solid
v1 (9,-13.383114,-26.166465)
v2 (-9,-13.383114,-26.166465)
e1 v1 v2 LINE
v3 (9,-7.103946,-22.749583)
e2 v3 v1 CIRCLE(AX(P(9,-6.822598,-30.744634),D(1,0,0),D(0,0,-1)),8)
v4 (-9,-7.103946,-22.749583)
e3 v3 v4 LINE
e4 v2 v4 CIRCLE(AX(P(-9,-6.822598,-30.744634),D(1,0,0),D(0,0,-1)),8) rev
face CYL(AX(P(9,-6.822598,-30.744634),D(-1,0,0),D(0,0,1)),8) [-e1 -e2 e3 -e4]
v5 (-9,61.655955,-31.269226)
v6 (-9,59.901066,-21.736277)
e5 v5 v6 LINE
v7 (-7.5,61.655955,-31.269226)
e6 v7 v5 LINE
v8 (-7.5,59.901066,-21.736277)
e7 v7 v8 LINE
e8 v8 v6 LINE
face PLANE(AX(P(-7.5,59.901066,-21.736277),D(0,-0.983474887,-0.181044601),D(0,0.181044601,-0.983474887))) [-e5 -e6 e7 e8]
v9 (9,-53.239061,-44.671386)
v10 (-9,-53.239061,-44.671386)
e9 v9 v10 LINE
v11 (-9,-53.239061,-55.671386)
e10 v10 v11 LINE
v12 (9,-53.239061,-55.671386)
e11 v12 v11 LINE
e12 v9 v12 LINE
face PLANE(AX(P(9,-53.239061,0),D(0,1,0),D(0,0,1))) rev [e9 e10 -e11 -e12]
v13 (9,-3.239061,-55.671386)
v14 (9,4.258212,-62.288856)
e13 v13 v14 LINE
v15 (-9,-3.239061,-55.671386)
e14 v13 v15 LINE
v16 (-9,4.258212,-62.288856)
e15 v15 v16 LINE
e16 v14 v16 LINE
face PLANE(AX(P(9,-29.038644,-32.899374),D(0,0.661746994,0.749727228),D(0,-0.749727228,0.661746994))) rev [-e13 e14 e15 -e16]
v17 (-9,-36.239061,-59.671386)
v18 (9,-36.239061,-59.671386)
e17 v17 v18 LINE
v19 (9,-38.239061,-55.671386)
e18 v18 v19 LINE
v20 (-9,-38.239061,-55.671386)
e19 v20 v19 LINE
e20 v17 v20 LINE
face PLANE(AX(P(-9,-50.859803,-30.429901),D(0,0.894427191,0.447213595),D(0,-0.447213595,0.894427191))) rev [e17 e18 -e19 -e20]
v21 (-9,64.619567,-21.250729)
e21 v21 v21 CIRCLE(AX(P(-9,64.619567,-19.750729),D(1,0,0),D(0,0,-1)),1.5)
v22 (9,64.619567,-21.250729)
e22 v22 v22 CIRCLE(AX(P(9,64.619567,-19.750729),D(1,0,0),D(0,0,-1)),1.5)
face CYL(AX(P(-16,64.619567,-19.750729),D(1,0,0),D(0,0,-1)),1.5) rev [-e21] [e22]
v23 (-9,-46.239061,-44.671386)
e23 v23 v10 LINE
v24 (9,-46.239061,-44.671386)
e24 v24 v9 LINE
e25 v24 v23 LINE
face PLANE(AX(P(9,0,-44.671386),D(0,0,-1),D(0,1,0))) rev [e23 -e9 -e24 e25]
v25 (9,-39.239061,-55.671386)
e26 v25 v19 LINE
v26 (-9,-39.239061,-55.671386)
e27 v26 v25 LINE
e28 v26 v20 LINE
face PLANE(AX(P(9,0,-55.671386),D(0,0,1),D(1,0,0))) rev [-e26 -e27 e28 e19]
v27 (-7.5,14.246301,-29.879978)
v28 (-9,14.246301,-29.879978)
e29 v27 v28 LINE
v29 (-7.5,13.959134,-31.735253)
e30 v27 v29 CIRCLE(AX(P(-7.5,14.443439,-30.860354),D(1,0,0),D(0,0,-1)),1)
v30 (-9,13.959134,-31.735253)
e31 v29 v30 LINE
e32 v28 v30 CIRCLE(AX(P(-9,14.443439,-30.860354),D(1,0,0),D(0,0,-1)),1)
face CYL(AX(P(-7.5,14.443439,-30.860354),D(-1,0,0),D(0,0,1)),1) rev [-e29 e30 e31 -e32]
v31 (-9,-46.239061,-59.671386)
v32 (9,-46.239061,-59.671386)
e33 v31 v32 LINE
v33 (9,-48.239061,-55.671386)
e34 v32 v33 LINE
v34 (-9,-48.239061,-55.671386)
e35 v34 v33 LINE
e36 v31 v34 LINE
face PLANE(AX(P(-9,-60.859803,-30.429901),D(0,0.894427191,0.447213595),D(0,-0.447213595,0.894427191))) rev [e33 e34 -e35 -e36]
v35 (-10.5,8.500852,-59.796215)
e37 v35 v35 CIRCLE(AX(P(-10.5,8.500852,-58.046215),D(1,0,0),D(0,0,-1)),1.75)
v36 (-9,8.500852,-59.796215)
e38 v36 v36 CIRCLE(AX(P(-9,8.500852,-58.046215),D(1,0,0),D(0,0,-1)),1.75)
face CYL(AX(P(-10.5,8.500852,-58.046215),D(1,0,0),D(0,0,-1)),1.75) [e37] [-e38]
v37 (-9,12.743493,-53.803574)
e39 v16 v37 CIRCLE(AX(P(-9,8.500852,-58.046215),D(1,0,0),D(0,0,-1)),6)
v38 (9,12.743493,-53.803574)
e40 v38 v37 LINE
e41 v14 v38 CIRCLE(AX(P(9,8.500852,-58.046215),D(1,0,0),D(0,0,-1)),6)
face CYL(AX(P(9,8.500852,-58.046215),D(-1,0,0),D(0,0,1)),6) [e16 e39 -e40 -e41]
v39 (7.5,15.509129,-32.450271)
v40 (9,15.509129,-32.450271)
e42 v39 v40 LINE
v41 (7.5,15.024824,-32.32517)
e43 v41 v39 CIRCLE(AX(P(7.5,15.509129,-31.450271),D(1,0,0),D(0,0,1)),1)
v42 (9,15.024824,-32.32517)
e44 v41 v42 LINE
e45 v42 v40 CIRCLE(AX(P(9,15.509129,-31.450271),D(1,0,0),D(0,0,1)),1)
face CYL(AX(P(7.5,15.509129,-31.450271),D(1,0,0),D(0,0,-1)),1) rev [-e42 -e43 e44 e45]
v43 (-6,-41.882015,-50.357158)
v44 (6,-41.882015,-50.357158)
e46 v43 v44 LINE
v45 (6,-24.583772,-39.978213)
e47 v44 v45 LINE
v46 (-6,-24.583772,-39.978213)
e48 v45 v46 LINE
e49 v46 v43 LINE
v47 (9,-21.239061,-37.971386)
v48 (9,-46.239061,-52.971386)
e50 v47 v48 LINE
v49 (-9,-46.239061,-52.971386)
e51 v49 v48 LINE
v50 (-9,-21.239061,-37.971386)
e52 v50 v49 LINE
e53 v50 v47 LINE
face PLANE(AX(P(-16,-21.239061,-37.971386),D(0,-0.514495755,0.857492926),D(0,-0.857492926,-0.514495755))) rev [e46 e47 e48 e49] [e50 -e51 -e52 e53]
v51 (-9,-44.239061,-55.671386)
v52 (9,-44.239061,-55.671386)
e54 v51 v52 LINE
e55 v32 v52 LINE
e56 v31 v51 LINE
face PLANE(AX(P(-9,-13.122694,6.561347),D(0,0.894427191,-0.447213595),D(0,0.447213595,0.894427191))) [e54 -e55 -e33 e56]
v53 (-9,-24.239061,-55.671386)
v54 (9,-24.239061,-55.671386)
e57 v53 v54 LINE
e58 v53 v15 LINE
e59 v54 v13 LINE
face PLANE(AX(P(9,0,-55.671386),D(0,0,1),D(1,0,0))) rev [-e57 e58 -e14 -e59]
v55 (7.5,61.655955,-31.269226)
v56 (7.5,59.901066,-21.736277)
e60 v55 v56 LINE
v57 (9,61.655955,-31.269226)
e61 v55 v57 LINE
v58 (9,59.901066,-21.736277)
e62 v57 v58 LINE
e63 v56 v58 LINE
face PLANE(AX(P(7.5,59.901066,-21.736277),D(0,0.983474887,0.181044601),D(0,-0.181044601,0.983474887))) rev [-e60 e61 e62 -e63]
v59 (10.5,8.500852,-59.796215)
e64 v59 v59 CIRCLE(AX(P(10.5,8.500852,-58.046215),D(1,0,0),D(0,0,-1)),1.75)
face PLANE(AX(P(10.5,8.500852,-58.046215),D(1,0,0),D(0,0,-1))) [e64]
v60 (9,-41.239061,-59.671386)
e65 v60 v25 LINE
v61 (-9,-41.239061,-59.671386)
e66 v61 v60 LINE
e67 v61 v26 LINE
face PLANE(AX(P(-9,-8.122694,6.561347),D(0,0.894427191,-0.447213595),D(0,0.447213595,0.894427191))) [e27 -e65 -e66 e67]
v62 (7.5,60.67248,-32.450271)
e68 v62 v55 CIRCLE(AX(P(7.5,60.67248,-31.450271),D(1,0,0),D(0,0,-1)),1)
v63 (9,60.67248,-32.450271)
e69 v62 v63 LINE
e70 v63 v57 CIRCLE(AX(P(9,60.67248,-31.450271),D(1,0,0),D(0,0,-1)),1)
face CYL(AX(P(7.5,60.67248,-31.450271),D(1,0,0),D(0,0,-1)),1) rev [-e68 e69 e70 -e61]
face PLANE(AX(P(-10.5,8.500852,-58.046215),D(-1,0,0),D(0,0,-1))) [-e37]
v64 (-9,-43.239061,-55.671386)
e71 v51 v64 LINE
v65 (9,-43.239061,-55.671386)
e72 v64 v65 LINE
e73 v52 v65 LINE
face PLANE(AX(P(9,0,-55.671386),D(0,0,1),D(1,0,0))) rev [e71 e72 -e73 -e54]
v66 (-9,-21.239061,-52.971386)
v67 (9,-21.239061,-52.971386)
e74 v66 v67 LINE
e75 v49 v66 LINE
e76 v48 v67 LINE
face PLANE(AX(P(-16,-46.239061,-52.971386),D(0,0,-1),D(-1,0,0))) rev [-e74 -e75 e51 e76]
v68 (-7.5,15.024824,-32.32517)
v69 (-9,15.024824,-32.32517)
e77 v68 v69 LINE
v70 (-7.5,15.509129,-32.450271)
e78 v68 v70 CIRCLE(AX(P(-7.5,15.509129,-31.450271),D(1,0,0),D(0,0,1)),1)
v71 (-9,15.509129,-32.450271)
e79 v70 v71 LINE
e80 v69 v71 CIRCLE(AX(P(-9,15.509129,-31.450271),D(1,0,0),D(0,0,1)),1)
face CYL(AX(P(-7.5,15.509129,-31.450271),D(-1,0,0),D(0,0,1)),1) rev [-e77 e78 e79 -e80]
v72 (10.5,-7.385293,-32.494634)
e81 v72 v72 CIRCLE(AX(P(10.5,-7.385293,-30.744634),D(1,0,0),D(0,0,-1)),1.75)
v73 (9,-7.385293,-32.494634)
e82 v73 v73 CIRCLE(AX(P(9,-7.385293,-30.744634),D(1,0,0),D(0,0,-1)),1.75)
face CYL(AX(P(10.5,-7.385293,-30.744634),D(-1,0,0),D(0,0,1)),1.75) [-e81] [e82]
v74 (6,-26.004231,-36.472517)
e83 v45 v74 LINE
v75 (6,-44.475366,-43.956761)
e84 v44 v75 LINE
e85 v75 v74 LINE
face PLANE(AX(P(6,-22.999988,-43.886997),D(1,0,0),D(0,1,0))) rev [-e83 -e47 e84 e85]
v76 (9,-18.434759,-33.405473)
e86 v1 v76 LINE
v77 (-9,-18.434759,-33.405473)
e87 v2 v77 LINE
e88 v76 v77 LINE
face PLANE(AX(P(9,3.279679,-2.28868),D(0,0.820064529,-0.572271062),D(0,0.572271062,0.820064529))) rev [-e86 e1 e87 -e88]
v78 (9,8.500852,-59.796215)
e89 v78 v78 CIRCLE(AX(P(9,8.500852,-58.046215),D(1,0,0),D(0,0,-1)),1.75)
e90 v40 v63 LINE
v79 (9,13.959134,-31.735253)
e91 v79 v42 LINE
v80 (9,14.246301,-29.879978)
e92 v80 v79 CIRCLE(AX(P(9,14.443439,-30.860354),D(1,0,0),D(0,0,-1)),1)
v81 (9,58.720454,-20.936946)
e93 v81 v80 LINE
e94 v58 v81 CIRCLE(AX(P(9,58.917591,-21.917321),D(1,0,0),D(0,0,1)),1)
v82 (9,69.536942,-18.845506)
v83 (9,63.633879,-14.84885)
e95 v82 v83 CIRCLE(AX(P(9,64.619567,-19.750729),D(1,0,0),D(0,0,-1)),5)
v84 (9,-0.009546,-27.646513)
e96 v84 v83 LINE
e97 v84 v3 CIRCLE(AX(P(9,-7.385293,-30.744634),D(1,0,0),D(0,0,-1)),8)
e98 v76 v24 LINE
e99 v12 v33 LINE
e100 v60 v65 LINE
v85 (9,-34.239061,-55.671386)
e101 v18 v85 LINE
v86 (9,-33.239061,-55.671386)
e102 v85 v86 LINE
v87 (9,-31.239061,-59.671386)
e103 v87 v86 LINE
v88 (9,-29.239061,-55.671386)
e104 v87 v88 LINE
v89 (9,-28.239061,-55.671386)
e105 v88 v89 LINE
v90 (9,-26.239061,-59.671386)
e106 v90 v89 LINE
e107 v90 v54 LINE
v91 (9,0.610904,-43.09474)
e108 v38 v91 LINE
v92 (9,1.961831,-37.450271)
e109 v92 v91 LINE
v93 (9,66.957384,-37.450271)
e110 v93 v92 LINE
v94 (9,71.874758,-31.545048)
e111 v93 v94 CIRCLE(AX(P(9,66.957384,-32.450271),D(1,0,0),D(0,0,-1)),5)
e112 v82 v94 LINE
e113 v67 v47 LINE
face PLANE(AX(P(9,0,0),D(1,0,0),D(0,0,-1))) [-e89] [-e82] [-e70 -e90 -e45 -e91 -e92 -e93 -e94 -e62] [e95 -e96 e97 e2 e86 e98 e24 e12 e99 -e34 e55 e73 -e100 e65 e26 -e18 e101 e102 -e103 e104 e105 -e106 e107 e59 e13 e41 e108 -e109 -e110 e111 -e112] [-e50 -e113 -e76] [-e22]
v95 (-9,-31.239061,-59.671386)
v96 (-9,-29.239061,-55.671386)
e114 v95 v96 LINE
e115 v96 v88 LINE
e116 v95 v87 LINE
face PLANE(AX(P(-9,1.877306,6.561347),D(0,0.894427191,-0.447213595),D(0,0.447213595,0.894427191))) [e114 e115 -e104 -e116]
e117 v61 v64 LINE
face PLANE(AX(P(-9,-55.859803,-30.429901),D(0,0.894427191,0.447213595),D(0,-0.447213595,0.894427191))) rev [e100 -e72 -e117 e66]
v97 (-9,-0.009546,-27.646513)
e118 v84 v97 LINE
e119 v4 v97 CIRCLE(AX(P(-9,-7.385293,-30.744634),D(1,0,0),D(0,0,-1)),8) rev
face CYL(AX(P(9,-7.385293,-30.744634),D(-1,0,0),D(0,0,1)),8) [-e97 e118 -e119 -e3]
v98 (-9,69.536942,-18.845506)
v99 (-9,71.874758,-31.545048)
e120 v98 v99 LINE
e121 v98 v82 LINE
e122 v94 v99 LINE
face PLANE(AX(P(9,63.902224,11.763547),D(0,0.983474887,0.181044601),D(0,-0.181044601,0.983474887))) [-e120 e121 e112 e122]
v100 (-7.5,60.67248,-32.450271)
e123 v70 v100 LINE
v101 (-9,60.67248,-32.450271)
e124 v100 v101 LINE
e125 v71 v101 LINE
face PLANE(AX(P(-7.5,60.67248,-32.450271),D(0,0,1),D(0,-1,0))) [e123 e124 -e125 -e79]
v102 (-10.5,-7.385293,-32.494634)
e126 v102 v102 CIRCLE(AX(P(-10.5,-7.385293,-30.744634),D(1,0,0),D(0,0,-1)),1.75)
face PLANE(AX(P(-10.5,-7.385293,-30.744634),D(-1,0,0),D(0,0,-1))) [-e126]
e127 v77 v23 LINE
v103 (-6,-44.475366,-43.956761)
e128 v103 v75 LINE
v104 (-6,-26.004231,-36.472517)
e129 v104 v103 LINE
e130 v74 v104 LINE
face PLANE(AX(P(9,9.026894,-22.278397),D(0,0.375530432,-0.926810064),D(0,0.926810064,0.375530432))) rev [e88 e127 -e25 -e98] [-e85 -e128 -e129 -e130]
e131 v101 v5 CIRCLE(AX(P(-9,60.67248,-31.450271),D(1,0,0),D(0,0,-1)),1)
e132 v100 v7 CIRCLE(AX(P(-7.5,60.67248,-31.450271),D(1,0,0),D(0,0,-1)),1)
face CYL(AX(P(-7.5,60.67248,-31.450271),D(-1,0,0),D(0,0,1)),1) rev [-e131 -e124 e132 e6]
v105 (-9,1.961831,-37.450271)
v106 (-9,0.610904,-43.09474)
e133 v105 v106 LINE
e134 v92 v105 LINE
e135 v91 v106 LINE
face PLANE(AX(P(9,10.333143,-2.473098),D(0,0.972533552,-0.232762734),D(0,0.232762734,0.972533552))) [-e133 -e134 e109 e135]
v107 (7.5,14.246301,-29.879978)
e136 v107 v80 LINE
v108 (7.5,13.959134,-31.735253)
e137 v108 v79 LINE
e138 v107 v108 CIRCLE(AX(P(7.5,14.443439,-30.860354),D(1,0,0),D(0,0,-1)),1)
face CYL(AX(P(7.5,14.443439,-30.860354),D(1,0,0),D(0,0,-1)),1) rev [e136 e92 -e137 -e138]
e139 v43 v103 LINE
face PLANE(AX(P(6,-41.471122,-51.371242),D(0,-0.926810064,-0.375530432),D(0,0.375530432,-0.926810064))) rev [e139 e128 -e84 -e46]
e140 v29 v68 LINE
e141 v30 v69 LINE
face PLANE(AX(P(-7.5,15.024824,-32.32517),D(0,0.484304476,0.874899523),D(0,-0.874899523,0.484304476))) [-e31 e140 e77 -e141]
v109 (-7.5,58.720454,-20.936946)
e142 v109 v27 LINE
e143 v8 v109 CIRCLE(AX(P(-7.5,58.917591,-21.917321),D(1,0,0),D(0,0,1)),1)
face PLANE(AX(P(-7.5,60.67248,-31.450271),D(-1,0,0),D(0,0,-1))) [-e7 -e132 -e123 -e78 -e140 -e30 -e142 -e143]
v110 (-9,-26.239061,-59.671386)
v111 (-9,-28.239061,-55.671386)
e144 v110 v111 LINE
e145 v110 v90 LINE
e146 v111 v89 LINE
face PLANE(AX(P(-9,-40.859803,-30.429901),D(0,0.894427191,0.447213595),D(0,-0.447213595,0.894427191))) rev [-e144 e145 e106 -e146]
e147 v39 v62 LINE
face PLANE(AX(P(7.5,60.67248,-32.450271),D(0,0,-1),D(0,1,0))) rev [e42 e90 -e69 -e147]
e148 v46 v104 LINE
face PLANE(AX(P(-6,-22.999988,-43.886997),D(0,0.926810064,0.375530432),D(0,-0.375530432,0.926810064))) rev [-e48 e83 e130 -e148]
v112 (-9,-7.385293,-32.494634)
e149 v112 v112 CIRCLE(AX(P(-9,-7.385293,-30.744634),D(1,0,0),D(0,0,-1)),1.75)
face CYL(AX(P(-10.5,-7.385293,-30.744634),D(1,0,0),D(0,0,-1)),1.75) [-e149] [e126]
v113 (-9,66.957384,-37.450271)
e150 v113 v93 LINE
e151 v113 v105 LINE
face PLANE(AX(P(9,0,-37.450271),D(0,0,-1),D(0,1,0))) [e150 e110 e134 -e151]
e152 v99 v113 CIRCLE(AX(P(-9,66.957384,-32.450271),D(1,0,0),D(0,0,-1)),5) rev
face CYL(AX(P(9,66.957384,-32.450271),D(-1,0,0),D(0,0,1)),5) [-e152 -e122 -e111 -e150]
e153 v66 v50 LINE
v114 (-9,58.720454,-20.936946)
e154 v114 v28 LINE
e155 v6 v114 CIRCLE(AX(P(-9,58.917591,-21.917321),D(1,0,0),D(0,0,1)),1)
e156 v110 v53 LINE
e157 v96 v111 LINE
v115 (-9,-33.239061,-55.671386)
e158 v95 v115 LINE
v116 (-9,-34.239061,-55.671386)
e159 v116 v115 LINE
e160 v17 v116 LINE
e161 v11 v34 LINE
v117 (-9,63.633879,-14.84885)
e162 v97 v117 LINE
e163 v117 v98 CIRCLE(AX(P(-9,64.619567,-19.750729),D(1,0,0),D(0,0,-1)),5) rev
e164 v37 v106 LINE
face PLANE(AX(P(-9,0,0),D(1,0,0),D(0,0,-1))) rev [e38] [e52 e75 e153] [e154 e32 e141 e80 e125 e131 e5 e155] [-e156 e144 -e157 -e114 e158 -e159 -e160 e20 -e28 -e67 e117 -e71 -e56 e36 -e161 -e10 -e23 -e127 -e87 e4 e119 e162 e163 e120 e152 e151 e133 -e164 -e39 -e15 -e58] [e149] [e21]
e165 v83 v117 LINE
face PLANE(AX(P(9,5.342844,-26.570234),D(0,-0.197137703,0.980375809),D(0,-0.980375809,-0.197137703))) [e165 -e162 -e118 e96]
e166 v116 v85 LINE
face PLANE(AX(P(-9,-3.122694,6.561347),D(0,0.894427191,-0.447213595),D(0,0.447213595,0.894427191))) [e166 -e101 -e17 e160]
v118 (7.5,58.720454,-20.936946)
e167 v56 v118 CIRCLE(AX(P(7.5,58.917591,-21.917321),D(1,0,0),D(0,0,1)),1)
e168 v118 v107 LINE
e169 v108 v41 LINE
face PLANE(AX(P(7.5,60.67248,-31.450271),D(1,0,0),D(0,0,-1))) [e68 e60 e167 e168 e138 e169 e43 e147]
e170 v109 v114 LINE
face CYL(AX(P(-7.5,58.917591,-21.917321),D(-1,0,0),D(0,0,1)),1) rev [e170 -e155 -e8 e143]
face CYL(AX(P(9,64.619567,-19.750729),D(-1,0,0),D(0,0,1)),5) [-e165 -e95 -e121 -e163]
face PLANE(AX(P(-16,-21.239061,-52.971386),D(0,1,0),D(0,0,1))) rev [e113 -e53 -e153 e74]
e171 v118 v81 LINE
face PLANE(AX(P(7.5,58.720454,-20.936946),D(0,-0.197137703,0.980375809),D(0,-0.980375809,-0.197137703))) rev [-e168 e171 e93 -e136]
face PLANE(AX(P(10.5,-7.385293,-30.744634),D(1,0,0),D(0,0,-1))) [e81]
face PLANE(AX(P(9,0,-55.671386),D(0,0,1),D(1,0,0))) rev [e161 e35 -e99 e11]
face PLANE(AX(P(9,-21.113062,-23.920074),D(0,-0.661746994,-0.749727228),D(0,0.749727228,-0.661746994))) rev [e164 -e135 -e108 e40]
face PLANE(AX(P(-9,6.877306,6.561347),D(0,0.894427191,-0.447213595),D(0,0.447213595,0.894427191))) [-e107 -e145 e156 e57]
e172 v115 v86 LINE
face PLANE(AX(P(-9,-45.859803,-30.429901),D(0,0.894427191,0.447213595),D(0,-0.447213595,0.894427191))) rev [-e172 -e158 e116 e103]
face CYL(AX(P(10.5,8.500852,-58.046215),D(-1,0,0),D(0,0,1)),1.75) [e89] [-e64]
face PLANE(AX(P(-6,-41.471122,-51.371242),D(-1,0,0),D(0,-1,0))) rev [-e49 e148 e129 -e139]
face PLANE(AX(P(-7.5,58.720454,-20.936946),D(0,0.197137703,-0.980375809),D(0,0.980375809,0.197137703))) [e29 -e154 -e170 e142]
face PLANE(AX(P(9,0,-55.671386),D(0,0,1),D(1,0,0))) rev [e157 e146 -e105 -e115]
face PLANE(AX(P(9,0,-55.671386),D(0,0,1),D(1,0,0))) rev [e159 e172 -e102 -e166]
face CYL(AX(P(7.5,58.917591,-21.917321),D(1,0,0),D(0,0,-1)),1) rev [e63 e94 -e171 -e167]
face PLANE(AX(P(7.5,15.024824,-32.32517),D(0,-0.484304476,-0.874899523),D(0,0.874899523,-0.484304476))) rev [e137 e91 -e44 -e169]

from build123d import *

# Parameters (mm, degrees)
BOSS_EXTRUDE1_DEPTH = 9
CUT_EXTRUDE1_DEPTH  = 25
BOSS_EXTRUDE2_DEPTH = 18
LPATTERN1_COUNT     = 5
LPATTERN1_PITCH     = 5
FILLET1_R           = 8
FILLET2_R           = 5
SKETCH5_R           = 1.5
CUT_EXTRUDE2_DEPTH  = 25
SKETCH8_W           = 12
SKETCH8_H           = 19.929795107
CUT_EXTRUDE4_DEPTH  = 8
SKETCH9_R           = 1.75
BOSS_EXTRUDE3_DEPTH = 1.5
SKETCH10_R          = 1.75
BOSS_EXTRUDE4_DEPTH = 1.5
CUT_EXTRUDE6_DEPTH  = 1.5


with BuildPart() as part:
    # Sketch1 → Boss-Extrude1 (new, symmetric)
    with BuildSketch(Plane(origin=(0, 0, 0), x_dir=(0, 0, -1), z_dir=(1, 0, 0))):
        Polygon((55.671385575, -3.239060519), (62.288855516, 4.258211757), (53.803574142, 12.743493131), (43.094739802, 0.610903558), (37.450270875, 1.961830752), (27.646512788, -0.009546276), (22.744633745, -0.995234789), (22.744633745, -10.995234789), (33.405472618, -18.4347586), (44.671385575, -46.239060519), (44.671385575, -53.239060519), (55.671385575, -53.239060519), align=None)
        Polygon((37.450270875, 1.961830752), (27.646512788, -0.009546276), (13.846873598, 68.616760329), (37.450270875, 72.961830752), align=None)
        with BuildLine():
            ThreePointArc((62.288855516, 4.258211757), (62.288855516, 12.743493131), (53.803574142, 12.743493131))
            Line((53.803574142, 12.743493131), (62.288855516, 4.258211757))
        make_face()
    extrude(amount=BOSS_EXTRUDE1_DEPTH, both=True)

    # Sketch3 → Cut-Extrude1 (cut)
    with BuildSketch(Plane(origin=(9, 0, 0), x_dir=(0, 0, -1), z_dir=(1, 0, 0))):
        Polygon((52.971385575, -46.239060519), (52.971385575, -21.239060519), (37.971385575, -21.239060519), align=None)
    extrude(amount=-CUT_EXTRUDE1_DEPTH, mode=Mode.SUBTRACT)

    # Sketch4 → Boss-Extrude2 (add)
    with BuildSketch(Plane(origin=(9, 0, 0), x_dir=(0, 0, -1), z_dir=(1, 0, 0))):
        Polygon((55.671385575, -44.239060519), (55.671385575, -46.239060519), (59.671385575, -46.239060519), align=None)
        Polygon((59.671385575, -46.239060519), (55.671385575, -46.239060519), (55.671385575, -48.239060519), align=None)
    boss_extrude2 = extrude(amount=-BOSS_EXTRUDE2_DEPTH)

    # LPattern1: Boss-Extrude2 ×5
    with Locations(*[(0, i * LPATTERN1_PITCH, 0) for i in range(1, LPATTERN1_COUNT)]):
        add(boss_extrude2)

    # Fillet1
    # the kernel refuses this fillet: 8 mm, written as the material it takes off along each edge
    with BuildSketch(Plane(origin=(-19.431592215, -10.995234789, -22.744633745), x_dir=(0, 1, 0), z_dir=(1, 0, 0))) as fillet1_piece_1:
        with BuildLine():
            CenterArc((FILLET1_R * 0.521579610744, -FILLET1_R), FILLET1_R, 90, 55.091253842)
            Line((-FILLET1_R * 0.298484917938, -FILLET1_R * 0.427728937655), (-FILLET1_R * 0.314886208512, -FILLET1_R * 0.416283516408))
            Line((-FILLET1_R * 0.314886208512, -FILLET1_R * 0.416283516408), (-FILLET1_R * 0.0104315922149, FILLET1_R * 0.02))
            Line((-FILLET1_R * 0.0104315922149, FILLET1_R * 0.02), (FILLET1_R * 0.521579610744, FILLET1_R * 0.02))
            Line((FILLET1_R * 0.521579610744, FILLET1_R * 0.02), (FILLET1_R * 0.521579610744, 0))
        make_face()
    extrude(amount=38.86318443, mode=Mode.SUBTRACT)
    with BuildSketch(Plane(origin=(-24.975146678, -0.995234789, -22.744633745), x_dir=(0, 0.1971377027252409, -0.9803758086388171), z_dir=(1, 0, 0))) as fillet1_piece_2:
        with BuildLine():
            CenterArc((6.583284982, -7.841760559), FILLET1_R, 101.414804466, 67.215566165)
            Line((-1.259721487, -6.264658937), (-1.416581616, -6.233116905))
            Line((-1.416581616, -6.233116905), (-0.156860129, 0.031542032))
            Line((-0.156860129, 0.031542032), (0, 0.16))
            ThreePointArc((0, 0.16), (2.5, 0.16), (4.9683343, 0.156835211))
            Line((4.9683343, 0.156835211), (5, 0))
        make_face()
    extrude(amount=49.950293357, mode=Mode.SUBTRACT)

    # Fillet2
    fillet2_edges = [part.edges().sort_by_distance(p)[0] for p in [
        (0, 68.616760329, -13.846873598),
        (0, 72.961830752, -37.450270875),
    ]]
    fillet(fillet2_edges, radius=FILLET2_R)

    # Sketch5 → Cut-Extrude2 (cut)
    with BuildSketch(Plane(origin=(9, 0, 0), x_dir=(0, 0, -1), z_dir=(1, 0, 0))):
        with Locations((19.750729409, 64.619567483)):
            Circle(SKETCH5_R)
    extrude(amount=-CUT_EXTRUDE2_DEPTH, mode=Mode.SUBTRACT)

    # Sketch8 → Cut-Extrude4 (cut)
    with BuildSketch(Plane(origin=(0, 9.02689363, -22.278396507), x_dir=(1, 0, 0), z_dir=(0, -0.3755304319039708, 0.926810063990469))):
        with Locations((0, -47.762420436)):
            Rectangle(SKETCH8_W, SKETCH8_H)
    extrude(amount=-CUT_EXTRUDE4_DEPTH, mode=Mode.SUBTRACT)

    # Sketch9 → Boss-Extrude3 (add)
    with BuildSketch(Plane(origin=(9, 0, 0), x_dir=(0, 0, -1), z_dir=(1, 0, 0))):
        with Locations((58.046214829, 8.500852444)):
            Circle(SKETCH9_R)
    boss_extrude3 = extrude(amount=BOSS_EXTRUDE3_DEPTH)

    # Sketch10 → Boss-Extrude4 (add)
    with BuildSketch(Plane(origin=(9, 0, 0), x_dir=(0, 0, -1), z_dir=(1, 0, 0))):
        with Locations((30.744633745, -7.385293461)):
            Circle(SKETCH10_R)
    boss_extrude4 = extrude(amount=BOSS_EXTRUDE4_DEPTH)

    # Sketch11 → Cut-Extrude6 (cut)
    with BuildSketch(Plane(origin=(9, 0, 0), x_dir=(0, 0, -1), z_dir=(1, 0, 0))):
        with BuildLine():
            Line((32.450270875, 60.672480234), (32.450270875, 15.509128812))
            ThreePointArc((32.450270875, 15.509128812), (32.418490768, 15.259028355), (32.325170397, 15.024824336))
            Line((32.325170397, 15.024824336), (31.735253047, 13.959134396))
            ThreePointArc((31.735253047, 13.959134396), (30.707391109, 13.455206865), (29.879977716, 14.246301169))
            Line((29.879977716, 14.246301169), (20.936945668, 58.720453776))
            ThreePointArc((20.936945668, 58.720453776), (21.089259967, 59.478228738), (21.736276876, 59.901066366))
            Line((21.736276876, 59.901066366), (31.269226274, 61.655955121))
            ThreePointArc((31.269226274, 61.655955121), (32.09017532, 61.440934723), (32.450270875, 60.672480234))
        make_face()
    cut_extrude6 = extrude(amount=-CUT_EXTRUDE6_DEPTH, mode=Mode.SUBTRACT)

    # Mirror1: Boss-Extrude3, Boss-Extrude4, Cut-Extrude6 across plane
    add(boss_extrude3.mirror(Plane(origin=(0, 0, 0), x_dir=(0, 0, 1), z_dir=(1, 0, 0))))
    add(boss_extrude4.mirror(Plane(origin=(0, 0, 0), x_dir=(0, 0, 1), z_dir=(1, 0, 0))))
    add(cut_extrude6.mirror(Plane(origin=(0, 0, 0), x_dir=(0, 0, 1), z_dir=(1, 0, 0))), mode=Mode.SUBTRACT)


solid = part.part
